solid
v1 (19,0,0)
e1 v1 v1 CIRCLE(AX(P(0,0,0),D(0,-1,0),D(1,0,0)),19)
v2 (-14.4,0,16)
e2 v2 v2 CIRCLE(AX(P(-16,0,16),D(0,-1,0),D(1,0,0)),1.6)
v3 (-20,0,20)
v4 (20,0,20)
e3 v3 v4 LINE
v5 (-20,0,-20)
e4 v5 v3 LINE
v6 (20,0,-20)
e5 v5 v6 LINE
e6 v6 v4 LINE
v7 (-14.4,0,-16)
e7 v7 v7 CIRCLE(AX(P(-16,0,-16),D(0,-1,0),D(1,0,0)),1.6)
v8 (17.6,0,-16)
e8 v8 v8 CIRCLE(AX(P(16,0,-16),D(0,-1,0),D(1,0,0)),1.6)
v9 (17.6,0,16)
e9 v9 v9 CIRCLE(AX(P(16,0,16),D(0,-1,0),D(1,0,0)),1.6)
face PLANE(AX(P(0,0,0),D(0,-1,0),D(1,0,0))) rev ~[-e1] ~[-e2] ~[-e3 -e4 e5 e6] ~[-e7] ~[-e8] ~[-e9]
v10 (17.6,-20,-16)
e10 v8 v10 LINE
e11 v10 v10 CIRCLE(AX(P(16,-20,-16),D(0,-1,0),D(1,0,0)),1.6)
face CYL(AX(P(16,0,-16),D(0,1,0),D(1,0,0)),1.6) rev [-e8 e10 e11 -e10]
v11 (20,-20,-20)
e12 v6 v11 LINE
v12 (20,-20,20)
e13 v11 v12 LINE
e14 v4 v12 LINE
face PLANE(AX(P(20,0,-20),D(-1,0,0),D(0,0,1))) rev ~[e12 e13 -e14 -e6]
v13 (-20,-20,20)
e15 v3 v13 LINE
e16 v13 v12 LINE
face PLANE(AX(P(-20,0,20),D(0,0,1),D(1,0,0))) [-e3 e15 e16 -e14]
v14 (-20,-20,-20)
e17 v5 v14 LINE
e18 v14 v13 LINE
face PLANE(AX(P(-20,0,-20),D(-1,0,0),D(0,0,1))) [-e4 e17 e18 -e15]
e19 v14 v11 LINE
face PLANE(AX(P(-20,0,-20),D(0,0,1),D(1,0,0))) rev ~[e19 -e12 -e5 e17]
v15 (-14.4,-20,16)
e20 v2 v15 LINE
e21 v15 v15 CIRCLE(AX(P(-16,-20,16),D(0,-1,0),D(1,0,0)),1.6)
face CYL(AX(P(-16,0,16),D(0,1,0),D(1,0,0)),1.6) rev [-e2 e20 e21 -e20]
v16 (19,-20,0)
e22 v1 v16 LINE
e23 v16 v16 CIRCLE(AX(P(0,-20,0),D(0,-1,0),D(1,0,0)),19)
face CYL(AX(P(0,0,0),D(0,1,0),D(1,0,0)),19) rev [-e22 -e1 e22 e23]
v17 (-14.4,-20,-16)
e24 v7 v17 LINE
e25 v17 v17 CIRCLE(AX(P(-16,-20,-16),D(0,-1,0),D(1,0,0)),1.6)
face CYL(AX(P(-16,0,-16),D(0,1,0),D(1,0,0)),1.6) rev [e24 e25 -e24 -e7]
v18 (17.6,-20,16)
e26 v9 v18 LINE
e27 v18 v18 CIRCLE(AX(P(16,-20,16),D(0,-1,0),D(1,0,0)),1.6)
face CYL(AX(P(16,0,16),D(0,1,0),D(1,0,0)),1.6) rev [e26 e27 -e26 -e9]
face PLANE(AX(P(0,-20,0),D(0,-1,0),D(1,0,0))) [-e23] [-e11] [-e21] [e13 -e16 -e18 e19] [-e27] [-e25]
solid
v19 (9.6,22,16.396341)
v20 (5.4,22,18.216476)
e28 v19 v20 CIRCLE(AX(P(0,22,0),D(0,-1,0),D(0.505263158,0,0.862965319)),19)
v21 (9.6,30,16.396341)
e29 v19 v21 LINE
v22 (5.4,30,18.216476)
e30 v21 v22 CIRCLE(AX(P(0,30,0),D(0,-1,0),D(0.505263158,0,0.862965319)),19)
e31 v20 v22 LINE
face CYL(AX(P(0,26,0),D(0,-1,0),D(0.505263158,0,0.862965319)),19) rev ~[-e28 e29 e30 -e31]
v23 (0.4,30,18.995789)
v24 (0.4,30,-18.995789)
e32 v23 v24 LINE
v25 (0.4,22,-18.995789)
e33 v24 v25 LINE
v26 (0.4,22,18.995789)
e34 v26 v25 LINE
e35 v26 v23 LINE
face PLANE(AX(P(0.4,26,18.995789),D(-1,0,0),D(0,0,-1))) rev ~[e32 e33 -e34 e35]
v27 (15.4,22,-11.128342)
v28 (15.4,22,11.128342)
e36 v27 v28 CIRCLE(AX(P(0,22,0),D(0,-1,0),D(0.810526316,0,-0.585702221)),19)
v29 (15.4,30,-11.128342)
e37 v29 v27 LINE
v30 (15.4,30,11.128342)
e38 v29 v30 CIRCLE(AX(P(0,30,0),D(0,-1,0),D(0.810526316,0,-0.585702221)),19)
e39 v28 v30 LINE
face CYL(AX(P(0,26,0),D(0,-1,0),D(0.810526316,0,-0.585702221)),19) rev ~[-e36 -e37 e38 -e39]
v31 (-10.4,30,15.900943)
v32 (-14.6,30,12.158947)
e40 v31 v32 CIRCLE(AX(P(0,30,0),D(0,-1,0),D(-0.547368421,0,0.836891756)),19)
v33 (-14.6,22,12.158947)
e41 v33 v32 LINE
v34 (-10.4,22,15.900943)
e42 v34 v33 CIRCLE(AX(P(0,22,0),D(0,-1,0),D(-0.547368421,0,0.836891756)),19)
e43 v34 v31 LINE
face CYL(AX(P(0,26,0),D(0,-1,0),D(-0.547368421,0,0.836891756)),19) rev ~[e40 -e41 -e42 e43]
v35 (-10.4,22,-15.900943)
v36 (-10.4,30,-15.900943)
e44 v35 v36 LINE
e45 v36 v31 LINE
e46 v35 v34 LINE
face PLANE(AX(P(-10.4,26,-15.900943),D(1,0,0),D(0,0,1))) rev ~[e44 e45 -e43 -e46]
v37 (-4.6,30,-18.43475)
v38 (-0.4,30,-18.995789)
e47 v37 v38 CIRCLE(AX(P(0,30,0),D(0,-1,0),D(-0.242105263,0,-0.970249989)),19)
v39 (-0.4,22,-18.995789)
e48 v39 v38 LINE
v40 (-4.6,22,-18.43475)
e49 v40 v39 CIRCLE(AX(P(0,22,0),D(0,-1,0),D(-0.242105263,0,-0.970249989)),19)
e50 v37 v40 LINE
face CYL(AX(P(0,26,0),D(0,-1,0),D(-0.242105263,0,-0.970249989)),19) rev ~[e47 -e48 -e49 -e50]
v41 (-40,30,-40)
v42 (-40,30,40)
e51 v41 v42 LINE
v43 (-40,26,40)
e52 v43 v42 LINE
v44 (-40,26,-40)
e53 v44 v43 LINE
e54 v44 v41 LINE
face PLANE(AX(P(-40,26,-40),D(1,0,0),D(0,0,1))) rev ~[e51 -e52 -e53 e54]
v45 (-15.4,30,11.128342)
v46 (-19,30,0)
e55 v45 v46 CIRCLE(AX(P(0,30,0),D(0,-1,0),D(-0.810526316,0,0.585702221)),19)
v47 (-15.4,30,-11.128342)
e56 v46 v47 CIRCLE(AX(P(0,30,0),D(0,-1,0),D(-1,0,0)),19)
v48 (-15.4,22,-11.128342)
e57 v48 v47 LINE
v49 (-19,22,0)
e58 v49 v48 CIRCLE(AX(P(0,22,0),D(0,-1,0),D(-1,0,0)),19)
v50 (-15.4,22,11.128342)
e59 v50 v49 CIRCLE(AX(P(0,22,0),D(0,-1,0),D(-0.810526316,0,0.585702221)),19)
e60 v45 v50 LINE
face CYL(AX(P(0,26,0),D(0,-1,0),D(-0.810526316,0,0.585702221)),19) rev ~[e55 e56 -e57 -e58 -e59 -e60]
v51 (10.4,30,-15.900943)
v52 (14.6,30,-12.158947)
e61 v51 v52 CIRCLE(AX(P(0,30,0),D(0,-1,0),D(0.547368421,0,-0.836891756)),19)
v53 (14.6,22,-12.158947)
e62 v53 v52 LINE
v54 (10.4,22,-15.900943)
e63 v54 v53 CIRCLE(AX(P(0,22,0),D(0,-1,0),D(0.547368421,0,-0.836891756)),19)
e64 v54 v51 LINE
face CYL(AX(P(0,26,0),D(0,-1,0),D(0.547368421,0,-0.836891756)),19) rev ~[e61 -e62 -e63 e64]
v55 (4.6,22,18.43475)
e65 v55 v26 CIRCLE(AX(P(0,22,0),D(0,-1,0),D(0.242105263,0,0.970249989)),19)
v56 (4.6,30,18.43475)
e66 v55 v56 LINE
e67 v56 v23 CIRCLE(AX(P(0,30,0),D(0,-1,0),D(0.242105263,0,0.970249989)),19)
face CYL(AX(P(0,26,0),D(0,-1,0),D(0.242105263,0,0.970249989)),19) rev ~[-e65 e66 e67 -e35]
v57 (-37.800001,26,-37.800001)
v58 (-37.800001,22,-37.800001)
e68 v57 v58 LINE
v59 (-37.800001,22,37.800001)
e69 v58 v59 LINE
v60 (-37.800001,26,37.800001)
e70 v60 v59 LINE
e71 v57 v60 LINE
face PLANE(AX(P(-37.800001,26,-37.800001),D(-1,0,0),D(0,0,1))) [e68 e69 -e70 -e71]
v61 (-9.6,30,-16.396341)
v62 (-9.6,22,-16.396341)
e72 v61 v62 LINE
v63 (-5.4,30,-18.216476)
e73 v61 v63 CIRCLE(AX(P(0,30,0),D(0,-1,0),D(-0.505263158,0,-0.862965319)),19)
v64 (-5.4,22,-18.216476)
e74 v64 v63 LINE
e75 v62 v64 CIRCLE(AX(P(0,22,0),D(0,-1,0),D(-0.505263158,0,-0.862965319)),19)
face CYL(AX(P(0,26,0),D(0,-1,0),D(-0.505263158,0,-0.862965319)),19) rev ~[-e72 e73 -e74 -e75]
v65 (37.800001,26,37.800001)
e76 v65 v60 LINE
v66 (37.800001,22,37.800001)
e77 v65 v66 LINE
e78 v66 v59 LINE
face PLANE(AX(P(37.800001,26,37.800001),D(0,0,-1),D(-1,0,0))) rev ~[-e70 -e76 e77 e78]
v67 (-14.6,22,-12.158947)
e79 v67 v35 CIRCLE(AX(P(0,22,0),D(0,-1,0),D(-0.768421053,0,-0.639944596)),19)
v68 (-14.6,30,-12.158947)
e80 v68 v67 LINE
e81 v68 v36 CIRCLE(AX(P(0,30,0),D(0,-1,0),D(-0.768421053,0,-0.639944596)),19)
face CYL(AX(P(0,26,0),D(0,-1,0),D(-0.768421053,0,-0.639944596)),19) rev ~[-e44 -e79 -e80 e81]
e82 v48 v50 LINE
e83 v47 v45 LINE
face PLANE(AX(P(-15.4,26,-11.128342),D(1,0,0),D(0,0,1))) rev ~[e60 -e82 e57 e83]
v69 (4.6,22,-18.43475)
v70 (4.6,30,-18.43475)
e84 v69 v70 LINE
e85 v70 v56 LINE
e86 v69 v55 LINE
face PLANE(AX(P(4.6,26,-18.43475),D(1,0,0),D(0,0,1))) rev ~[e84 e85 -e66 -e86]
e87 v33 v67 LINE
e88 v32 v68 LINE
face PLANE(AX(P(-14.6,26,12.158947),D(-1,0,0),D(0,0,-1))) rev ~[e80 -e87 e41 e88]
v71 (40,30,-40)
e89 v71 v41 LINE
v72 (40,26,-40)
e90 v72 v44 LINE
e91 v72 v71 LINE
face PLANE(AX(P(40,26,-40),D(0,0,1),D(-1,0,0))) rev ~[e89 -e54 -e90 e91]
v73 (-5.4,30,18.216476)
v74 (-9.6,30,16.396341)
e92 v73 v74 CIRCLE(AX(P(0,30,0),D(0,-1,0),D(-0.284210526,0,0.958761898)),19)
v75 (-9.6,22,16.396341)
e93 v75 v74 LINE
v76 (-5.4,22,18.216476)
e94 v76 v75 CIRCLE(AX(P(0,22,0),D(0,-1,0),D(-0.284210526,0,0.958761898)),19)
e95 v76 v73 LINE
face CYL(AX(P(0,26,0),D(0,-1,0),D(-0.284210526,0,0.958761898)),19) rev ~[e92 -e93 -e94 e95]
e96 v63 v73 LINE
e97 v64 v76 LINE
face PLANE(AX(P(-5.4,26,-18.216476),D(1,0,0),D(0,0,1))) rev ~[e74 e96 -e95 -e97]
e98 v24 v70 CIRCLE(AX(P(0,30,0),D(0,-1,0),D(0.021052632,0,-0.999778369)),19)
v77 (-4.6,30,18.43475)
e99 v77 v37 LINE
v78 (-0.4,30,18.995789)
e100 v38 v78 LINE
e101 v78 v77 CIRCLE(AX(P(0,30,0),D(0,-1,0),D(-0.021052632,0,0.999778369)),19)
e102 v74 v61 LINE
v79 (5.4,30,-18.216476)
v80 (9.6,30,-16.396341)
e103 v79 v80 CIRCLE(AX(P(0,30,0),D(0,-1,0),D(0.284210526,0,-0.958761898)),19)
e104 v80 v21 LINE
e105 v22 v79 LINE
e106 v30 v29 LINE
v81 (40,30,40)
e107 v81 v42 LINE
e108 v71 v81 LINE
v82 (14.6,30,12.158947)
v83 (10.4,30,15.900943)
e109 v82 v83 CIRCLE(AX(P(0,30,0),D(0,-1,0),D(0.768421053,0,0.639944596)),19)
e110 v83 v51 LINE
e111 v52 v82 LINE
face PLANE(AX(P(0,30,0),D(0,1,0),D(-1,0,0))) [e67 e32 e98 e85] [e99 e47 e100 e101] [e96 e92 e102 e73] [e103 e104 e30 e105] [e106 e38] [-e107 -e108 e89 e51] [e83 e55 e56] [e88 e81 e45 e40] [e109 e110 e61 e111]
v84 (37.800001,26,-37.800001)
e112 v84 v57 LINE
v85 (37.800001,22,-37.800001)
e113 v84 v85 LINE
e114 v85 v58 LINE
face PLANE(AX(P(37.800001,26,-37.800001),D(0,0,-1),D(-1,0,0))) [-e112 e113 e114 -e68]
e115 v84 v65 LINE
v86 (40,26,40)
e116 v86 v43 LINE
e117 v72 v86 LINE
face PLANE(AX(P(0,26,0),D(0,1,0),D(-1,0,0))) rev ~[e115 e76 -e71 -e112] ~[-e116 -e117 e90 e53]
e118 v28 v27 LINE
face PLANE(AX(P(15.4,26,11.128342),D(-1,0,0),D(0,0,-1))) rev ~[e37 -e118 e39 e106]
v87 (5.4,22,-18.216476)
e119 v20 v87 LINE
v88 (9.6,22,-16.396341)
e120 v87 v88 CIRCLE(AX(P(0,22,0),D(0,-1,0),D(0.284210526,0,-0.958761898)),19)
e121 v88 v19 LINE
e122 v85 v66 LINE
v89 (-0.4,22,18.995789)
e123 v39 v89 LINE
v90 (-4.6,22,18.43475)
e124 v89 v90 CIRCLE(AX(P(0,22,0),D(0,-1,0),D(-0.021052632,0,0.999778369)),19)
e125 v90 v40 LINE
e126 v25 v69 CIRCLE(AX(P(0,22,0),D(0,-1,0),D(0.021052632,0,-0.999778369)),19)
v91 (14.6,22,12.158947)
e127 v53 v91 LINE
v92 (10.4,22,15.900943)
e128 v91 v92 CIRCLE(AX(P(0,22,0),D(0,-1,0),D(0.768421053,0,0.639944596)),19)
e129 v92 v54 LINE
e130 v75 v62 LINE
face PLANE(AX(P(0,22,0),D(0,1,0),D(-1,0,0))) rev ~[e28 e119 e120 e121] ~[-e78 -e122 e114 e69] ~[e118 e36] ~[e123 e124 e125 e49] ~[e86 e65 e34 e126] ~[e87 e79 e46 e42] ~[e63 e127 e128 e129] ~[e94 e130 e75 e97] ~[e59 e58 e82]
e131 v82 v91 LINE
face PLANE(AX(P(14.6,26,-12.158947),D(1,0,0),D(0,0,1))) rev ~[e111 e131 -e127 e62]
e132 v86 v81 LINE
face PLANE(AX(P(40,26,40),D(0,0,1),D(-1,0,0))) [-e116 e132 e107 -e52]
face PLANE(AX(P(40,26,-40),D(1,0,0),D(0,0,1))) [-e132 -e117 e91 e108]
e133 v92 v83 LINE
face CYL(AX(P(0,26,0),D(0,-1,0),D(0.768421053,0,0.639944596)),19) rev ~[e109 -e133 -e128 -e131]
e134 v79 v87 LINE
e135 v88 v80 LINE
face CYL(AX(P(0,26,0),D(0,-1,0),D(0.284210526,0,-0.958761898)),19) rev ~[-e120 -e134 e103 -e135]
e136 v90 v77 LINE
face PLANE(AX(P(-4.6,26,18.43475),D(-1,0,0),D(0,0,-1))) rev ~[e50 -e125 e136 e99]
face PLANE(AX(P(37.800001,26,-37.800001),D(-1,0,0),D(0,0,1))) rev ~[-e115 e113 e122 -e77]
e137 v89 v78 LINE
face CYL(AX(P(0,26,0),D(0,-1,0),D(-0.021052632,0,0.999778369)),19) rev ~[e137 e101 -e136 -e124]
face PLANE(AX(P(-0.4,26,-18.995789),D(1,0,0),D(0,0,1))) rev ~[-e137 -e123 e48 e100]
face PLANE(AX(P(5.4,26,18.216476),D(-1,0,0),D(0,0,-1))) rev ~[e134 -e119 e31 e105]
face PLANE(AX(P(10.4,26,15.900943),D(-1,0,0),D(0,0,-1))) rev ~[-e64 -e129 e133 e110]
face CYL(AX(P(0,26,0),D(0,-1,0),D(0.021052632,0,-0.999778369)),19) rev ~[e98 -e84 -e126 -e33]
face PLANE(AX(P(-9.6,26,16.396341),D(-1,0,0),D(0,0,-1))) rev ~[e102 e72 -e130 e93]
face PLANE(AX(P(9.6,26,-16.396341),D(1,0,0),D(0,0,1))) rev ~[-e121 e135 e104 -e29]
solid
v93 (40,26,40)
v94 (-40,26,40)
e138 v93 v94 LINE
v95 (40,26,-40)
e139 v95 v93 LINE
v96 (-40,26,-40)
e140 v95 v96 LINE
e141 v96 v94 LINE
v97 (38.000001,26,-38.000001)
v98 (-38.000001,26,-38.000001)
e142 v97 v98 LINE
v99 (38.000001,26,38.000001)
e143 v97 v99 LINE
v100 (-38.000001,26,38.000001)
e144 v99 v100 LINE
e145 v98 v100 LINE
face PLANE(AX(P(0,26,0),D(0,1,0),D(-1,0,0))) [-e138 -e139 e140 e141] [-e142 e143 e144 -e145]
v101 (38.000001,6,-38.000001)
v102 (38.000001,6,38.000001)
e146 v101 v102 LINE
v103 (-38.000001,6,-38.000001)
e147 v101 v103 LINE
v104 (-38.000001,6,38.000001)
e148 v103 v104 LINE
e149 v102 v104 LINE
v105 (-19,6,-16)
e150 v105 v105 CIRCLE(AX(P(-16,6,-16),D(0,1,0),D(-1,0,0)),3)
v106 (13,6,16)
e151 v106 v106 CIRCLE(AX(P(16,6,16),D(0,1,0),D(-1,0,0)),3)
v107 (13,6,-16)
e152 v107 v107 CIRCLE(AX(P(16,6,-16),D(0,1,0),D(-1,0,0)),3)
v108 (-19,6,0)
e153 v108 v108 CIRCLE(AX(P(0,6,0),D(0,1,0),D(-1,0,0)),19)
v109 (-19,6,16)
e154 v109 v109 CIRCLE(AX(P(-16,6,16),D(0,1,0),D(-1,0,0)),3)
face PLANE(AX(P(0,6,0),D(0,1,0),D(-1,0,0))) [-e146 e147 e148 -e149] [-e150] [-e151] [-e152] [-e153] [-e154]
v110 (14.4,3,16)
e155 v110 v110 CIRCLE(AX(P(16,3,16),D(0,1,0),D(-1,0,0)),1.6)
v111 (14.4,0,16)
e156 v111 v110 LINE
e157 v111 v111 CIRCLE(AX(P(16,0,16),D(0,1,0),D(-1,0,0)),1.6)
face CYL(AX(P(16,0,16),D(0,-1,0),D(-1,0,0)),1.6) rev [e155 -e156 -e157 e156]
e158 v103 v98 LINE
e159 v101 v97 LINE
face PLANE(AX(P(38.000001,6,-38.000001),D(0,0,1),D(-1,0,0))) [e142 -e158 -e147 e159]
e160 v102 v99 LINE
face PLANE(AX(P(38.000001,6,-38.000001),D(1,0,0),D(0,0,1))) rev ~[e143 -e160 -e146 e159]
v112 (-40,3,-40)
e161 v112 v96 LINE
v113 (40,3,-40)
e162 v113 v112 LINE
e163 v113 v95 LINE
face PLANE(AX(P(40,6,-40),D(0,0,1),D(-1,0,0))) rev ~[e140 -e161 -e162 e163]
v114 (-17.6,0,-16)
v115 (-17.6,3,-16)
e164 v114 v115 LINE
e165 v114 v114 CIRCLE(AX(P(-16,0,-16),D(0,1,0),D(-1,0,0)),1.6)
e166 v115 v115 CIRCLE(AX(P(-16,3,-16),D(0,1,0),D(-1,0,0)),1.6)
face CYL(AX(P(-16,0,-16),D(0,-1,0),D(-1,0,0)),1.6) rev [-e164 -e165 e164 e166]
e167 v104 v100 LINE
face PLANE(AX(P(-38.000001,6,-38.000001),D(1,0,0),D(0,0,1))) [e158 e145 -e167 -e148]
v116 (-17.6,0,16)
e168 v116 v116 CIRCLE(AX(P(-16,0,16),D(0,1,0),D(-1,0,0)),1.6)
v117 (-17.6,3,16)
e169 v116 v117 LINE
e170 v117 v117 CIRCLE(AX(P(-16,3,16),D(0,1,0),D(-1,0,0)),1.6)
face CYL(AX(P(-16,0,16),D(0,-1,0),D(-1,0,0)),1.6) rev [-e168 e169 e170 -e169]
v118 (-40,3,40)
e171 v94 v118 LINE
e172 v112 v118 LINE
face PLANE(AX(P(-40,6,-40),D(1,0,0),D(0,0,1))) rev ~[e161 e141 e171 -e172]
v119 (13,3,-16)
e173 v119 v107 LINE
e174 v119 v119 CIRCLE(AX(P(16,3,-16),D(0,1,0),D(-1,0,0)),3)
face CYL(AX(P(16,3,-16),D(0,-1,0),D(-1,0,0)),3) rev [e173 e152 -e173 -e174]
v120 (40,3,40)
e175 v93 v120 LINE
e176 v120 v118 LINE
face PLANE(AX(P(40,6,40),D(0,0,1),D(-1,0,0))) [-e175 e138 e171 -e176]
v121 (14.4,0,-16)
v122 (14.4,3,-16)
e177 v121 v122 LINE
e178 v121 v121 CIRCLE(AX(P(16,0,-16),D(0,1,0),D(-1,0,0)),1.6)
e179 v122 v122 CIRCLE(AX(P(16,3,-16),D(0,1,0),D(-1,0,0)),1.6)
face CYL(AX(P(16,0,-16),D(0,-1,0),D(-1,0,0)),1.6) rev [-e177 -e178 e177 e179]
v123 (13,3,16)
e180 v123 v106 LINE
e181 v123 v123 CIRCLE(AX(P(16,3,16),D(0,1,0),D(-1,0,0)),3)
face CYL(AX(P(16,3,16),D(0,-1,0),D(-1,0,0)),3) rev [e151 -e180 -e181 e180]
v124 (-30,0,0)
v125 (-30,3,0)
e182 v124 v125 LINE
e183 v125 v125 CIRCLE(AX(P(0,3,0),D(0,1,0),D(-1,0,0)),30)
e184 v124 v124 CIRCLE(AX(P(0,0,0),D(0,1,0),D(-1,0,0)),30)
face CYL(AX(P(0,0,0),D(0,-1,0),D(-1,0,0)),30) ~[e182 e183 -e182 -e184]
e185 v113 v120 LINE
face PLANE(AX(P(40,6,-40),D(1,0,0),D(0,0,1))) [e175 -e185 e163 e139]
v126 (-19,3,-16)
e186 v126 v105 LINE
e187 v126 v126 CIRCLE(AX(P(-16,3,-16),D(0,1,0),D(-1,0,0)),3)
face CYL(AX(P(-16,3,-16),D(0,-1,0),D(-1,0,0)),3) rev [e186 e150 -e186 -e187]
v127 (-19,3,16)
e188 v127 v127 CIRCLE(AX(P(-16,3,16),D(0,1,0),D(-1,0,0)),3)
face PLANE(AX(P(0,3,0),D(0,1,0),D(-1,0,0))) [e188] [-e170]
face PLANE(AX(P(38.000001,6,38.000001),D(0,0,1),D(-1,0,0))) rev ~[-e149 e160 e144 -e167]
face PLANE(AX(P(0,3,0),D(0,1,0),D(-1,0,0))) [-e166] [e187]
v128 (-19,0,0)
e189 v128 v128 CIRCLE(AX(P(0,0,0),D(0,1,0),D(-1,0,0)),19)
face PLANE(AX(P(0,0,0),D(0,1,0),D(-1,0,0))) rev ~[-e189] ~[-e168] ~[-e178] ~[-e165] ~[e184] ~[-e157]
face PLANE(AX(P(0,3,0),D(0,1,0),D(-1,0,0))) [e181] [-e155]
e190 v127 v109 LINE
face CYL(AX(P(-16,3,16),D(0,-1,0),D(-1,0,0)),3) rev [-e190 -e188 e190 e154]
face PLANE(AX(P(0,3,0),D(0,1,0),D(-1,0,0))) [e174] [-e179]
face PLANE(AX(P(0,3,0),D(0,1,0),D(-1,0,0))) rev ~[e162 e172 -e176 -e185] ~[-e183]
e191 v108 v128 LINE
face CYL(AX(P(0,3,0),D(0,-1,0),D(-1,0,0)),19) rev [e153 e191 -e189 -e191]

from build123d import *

# Parameters (mm, degrees)
F0_W      = 40
F0_H      = 40
F0_R      = 1.6
F0_R_2    = 19
F1_DEPTH  = 20
F2_R      = 30
F2_W      = 40
F2_H      = 40
F2_R_2    = 1.6
F2_R_3    = 19
F3_DEPTH  = 3
F4_W      = 80
F4_H      = 80
F4_R      = 30
F4_R_2    = 3
F4_R_3    = 19
F5_DEPTH  = 3
F6_W      = 80
F6_H      = 80
F6_W_2    = 76.0000017285
F6_H_2    = 76.0000017285
F7_DEPTH  = 20
F8_W      = 75.600002408
F8_H      = 75.600002408
F9_DEPTH  = 4
F8_W_2    = 80
F8_H_2    = 80
F8_W_3    = 76.0000017285
F8_H_3    = 76.0000017285
F10_DEPTH = 4


# Not quite as in the source:
# - a feature names something its author has since deleted; it is built from what else it names


with BuildPart() as f1:
    # F0 (on Front) → F1 (new body)
    with BuildSketch(Plane.XZ):
        Rectangle(F0_W, F0_H)
        with Locations((-16, -16)):
            Circle(F0_R, mode=Mode.SUBTRACT)
        with Locations((16, -16)):
            Circle(F0_R, mode=Mode.SUBTRACT)
        with Locations((-16, 16)):
            Circle(F0_R, mode=Mode.SUBTRACT)
        Circle(F0_R_2, mode=Mode.SUBTRACT)
        with Locations((16, 16)):
            Circle(F0_R, mode=Mode.SUBTRACT)
    extrude(amount=F1_DEPTH)


with BuildPart() as f3:
    # F2 (on face) → F3 (new body)
    with BuildSketch(Plane(origin=(0, 0, 0), x_dir=(-1, 0, 0), z_dir=(0, 1, 0))):
        Circle(F2_R)
        Rectangle(F2_W, F2_H, mode=Mode.SUBTRACT)
        Rectangle(F2_W, F2_H)
        with Locations((-16, -16)):
            Circle(F2_R_2, mode=Mode.SUBTRACT)
        with Locations((16, -16)):
            Circle(F2_R_2, mode=Mode.SUBTRACT)
        with Locations((-16, 16)):
            Circle(F2_R_2, mode=Mode.SUBTRACT)
        Circle(F2_R_3, mode=Mode.SUBTRACT)
        with Locations((16, 16)):
            Circle(F2_R_2, mode=Mode.SUBTRACT)
    extrude(amount=F3_DEPTH)

    # F4 (on face) → F5 (join)
    with BuildSketch(Plane(origin=(0, 3, 0), x_dir=(-1, 0, 0), z_dir=(0, 1, 0))):
        Rectangle(F4_W, F4_H)
        Circle(F4_R, mode=Mode.SUBTRACT)
        Circle(F4_R)
        with Locations((-16, -16)):
            Circle(F4_R_2, mode=Mode.SUBTRACT)
        with Locations((16, -16)):
            Circle(F4_R_2, mode=Mode.SUBTRACT)
        with Locations((-16, 16)):
            Circle(F4_R_2, mode=Mode.SUBTRACT)
        Circle(F4_R_3, mode=Mode.SUBTRACT)
        with Locations((16, 16)):
            Circle(F4_R_2, mode=Mode.SUBTRACT)
    extrude(amount=F5_DEPTH)

    # F6 (on face) → F7 (join)
    with BuildSketch(Plane(origin=(0, 6, 0), x_dir=(-1, 0, 0), z_dir=(0, 1, 0))):
        Rectangle(F6_W, F6_H)
        Rectangle(F6_W_2, F6_H_2, mode=Mode.SUBTRACT)
    extrude(amount=F7_DEPTH)


with BuildPart() as f9:
    # F8 (on face) → F9 (new body)
    with BuildSketch(Plane(origin=(0, 26, 0), x_dir=(-1, 0, 0), z_dir=(0, 1, 0))):
        Rectangle(F8_W, F8_H)
        with BuildLine():
            ThreePointArc((15.4, 11.1283421946), (18.0776104616, 5.8480766069), (19, 0))
            ThreePointArc((19, 0), (18.0776104616, -5.8480766069), (15.4, -11.1283421946))
            ThreePointArc((15.4, -11.1283421946), (15.0088486145, -11.6505134336), (14.6, -12.1589473229))
            ThreePointArc((14.6, -12.1589473229), (12.6392497246, -14.1862386276), (10.4, -15.9009433682))
            ThreePointArc((10.4, -15.9009433682), (10.0030672654, -16.153595429), (9.6, -16.3963410552))
            ThreePointArc((9.6, -16.3963410552), (7.5550130945, -17.4333524356), (5.4, -18.2164760588))
            ThreePointArc((5.4, -18.2164760588), (5.0011909438, -18.3299778817), (4.6, -18.4347497949))
            ThreePointArc((4.6, -18.4347497949), (2.5156890208, -18.8327191014), (0.4, -18.995789007))
            ThreePointArc((0.4, -18.995789007), (0, -19), (-0.4, -18.995789007))
            ThreePointArc((-0.4, -18.995789007), (-2.5156890208, -18.8327191014), (-4.6, -18.4347497949))
            ThreePointArc((-4.6, -18.4347497949), (-5.0011909438, -18.3299778817), (-5.4, -18.2164760588))
            ThreePointArc((-5.4, -18.2164760588), (-7.5550130945, -17.4333524356), (-9.6, -16.3963410552))
            ThreePointArc((-9.6, -16.3963410552), (-10.0030672654, -16.153595429), (-10.4, -15.9009433682))
            ThreePointArc((-10.4, -15.9009433682), (-12.6392497246, -14.1862386276), (-14.6, -12.1589473229))
            ThreePointArc((-14.6, -12.1589473229), (-15.0088486145, -11.6505134336), (-15.4, -11.1283421946))
            ThreePointArc((-15.4, -11.1283421946), (-19, 0), (-15.4, 11.1283421946))
            ThreePointArc((-15.4, 11.1283421946), (-15.0088486145, 11.6505134336), (-14.6, 12.1589473229))
            ThreePointArc((-14.6, 12.1589473229), (-12.6392497246, 14.1862386276), (-10.4, 15.9009433682))
            ThreePointArc((-10.4, 15.9009433682), (-10.0030672654, 16.153595429), (-9.6, 16.3963410552))
            ThreePointArc((-9.6, 16.3963410552), (-7.5550130945, 17.4333524356), (-5.4, 18.2164760588))
            ThreePointArc((-5.4, 18.2164760588), (-5.0011909438, 18.3299778817), (-4.6, 18.4347497949))
            ThreePointArc((-4.6, 18.4347497949), (-2.5156890208, 18.8327191014), (-0.4, 18.995789007))
            ThreePointArc((-0.4, 18.995789007), (0, 19), (0.4, 18.995789007))
            ThreePointArc((0.4, 18.995789007), (2.5156890208, 18.8327191014), (4.6, 18.4347497949))
            ThreePointArc((4.6, 18.4347497949), (5.0011909438, 18.3299778817), (5.4, 18.2164760588))
            ThreePointArc((5.4, 18.2164760588), (7.5550130945, 17.4333524356), (9.6, 16.3963410552))
            ThreePointArc((9.6, 16.3963410552), (10.0030672654, 16.153595429), (10.4, 15.9009433682))
            ThreePointArc((10.4, 15.9009433682), (12.6392497246, 14.1862386276), (14.6, 12.1589473229))
            ThreePointArc((14.6, 12.1589473229), (15.0088486145, 11.6505134336), (15.4, 11.1283421946))
        make_face(mode=Mode.SUBTRACT)
        with BuildLine():
            Line((-14.6, -12.1589473229), (-14.6, 12.1589473229))
            ThreePointArc((-14.6, 12.1589473229), (-15.0088486145, 11.6505134336), (-15.4, 11.1283421946))
            Line((-15.4, 11.1283421946), (-15.4, -11.1283421946))
            ThreePointArc((-15.4, -11.1283421946), (-15.0088486145, -11.6505134336), (-14.6, -12.1589473229))
        make_face()
        with BuildLine():
            Line((-9.6, -16.3963410552), (-9.6, 16.3963410552))
            ThreePointArc((-9.6, 16.3963410552), (-10.0030672654, 16.153595429), (-10.4, 15.9009433682))
            Line((-10.4, 15.9009433682), (-10.4, -15.9009433682))
            ThreePointArc((-10.4, -15.9009433682), (-10.0030672654, -16.153595429), (-9.6, -16.3963410552))
        make_face()
        with BuildLine():
            Line((-4.6, -18.4347497949), (-4.6, 18.4347497949))
            ThreePointArc((-4.6, 18.4347497949), (-5.0011909438, 18.3299778817), (-5.4, 18.2164760588))
            Line((-5.4, 18.2164760588), (-5.4, -18.2164760588))
            ThreePointArc((-5.4, -18.2164760588), (-5.0011909438, -18.3299778817), (-4.6, -18.4347497949))
        make_face()
        with BuildLine():
            Line((0.4, -18.995789007), (0.4, 18.995789007))
            ThreePointArc((0.4, 18.995789007), (0, 19), (-0.4, 18.995789007))
            Line((-0.4, 18.995789007), (-0.4, -18.995789007))
            ThreePointArc((-0.4, -18.995789007), (0, -19), (0.4, -18.995789007))
        make_face()
        with BuildLine():
            Line((5.4, -18.2164760588), (5.4, 18.2164760588))
            ThreePointArc((5.4, 18.2164760588), (5.0011909438, 18.3299778817), (4.6, 18.4347497949))
            Line((4.6, 18.4347497949), (4.6, -18.4347497949))
            ThreePointArc((4.6, -18.4347497949), (5.0011909438, -18.3299778817), (5.4, -18.2164760588))
        make_face()
        with BuildLine():
            Line((10.4, -15.9009433682), (10.4, 15.9009433682))
            ThreePointArc((10.4, 15.9009433682), (10.0030672654, 16.153595429), (9.6, 16.3963410552))
            Line((9.6, 16.3963410552), (9.6, -16.3963410552))
            ThreePointArc((9.6, -16.3963410552), (10.0030672654, -16.153595429), (10.4, -15.9009433682))
        make_face()
        with BuildLine():
            Line((15.4, -11.1283421946), (15.4, 11.1283421946))
            ThreePointArc((15.4, 11.1283421946), (15.0088486145, 11.6505134336), (14.6, 12.1589473229))
            Line((14.6, 12.1589473229), (14.6, -12.1589473229))
            ThreePointArc((14.6, -12.1589473229), (15.0088486145, -11.6505134336), (15.4, -11.1283421946))
        make_face()
    extrude(amount=-F9_DEPTH)

    # F8 (on face) → F10 (join)
    with BuildSketch(Plane(origin=(0, 26, 0), x_dir=(-1, 0, 0), z_dir=(0, 1, 0))):
        Rectangle(F8_W_2, F8_H_2)
        Rectangle(F8_W_3, F8_H_3, mode=Mode.SUBTRACT)
        Rectangle(F8_W_3, F8_H_3)
        Rectangle(F8_W, F8_H, mode=Mode.SUBTRACT)
        Rectangle(F8_W, F8_H)
        with BuildLine():
            ThreePointArc((15.4, 11.1283421946), (18.0776104616, 5.8480766069), (19, 0))
            ThreePointArc((19, 0), (18.0776104616, -5.8480766069), (15.4, -11.1283421946))
            ThreePointArc((15.4, -11.1283421946), (15.0088486145, -11.6505134336), (14.6, -12.1589473229))
            ThreePointArc((14.6, -12.1589473229), (12.6392497246, -14.1862386276), (10.4, -15.9009433682))
            ThreePointArc((10.4, -15.9009433682), (10.0030672654, -16.153595429), (9.6, -16.3963410552))
            ThreePointArc((9.6, -16.3963410552), (7.5550130945, -17.4333524356), (5.4, -18.2164760588))
            ThreePointArc((5.4, -18.2164760588), (5.0011909438, -18.3299778817), (4.6, -18.4347497949))
            ThreePointArc((4.6, -18.4347497949), (2.5156890208, -18.8327191014), (0.4, -18.995789007))
            ThreePointArc((0.4, -18.995789007), (0, -19), (-0.4, -18.995789007))
            ThreePointArc((-0.4, -18.995789007), (-2.5156890208, -18.8327191014), (-4.6, -18.4347497949))
            ThreePointArc((-4.6, -18.4347497949), (-5.0011909438, -18.3299778817), (-5.4, -18.2164760588))
            ThreePointArc((-5.4, -18.2164760588), (-7.5550130945, -17.4333524356), (-9.6, -16.3963410552))
            ThreePointArc((-9.6, -16.3963410552), (-10.0030672654, -16.153595429), (-10.4, -15.9009433682))
            ThreePointArc((-10.4, -15.9009433682), (-12.6392497246, -14.1862386276), (-14.6, -12.1589473229))
            ThreePointArc((-14.6, -12.1589473229), (-15.0088486145, -11.6505134336), (-15.4, -11.1283421946))
            ThreePointArc((-15.4, -11.1283421946), (-19, 0), (-15.4, 11.1283421946))
            ThreePointArc((-15.4, 11.1283421946), (-15.0088486145, 11.6505134336), (-14.6, 12.1589473229))
            ThreePointArc((-14.6, 12.1589473229), (-12.6392497246, 14.1862386276), (-10.4, 15.9009433682))
            ThreePointArc((-10.4, 15.9009433682), (-10.0030672654, 16.153595429), (-9.6, 16.3963410552))
            ThreePointArc((-9.6, 16.3963410552), (-7.5550130945, 17.4333524356), (-5.4, 18.2164760588))
            ThreePointArc((-5.4, 18.2164760588), (-5.0011909438, 18.3299778817), (-4.6, 18.4347497949))
            ThreePointArc((-4.6, 18.4347497949), (-2.5156890208, 18.8327191014), (-0.4, 18.995789007))
            ThreePointArc((-0.4, 18.995789007), (0, 19), (0.4, 18.995789007))
            ThreePointArc((0.4, 18.995789007), (2.5156890208, 18.8327191014), (4.6, 18.4347497949))
            ThreePointArc((4.6, 18.4347497949), (5.0011909438, 18.3299778817), (5.4, 18.2164760588))
            ThreePointArc((5.4, 18.2164760588), (7.5550130945, 17.4333524356), (9.6, 16.3963410552))
            ThreePointArc((9.6, 16.3963410552), (10.0030672654, 16.153595429), (10.4, 15.9009433682))
            ThreePointArc((10.4, 15.9009433682), (12.6392497246, 14.1862386276), (14.6, 12.1589473229))
            ThreePointArc((14.6, 12.1589473229), (15.0088486145, 11.6505134336), (15.4, 11.1283421946))
        make_face(mode=Mode.SUBTRACT)
        with BuildLine():
            Line((-9.6, -16.3963410552), (-9.6, 16.3963410552))
            ThreePointArc((-9.6, 16.3963410552), (-10.0030672654, 16.153595429), (-10.4, 15.9009433682))
            Line((-10.4, 15.9009433682), (-10.4, -15.9009433682))
            ThreePointArc((-10.4, -15.9009433682), (-10.0030672654, -16.153595429), (-9.6, -16.3963410552))
        make_face()
        with BuildLine():
            Line((-14.6, -12.1589473229), (-14.6, 12.1589473229))
            ThreePointArc((-14.6, 12.1589473229), (-15.0088486145, 11.6505134336), (-15.4, 11.1283421946))
            Line((-15.4, 11.1283421946), (-15.4, -11.1283421946))
            ThreePointArc((-15.4, -11.1283421946), (-15.0088486145, -11.6505134336), (-14.6, -12.1589473229))
        make_face()
        with BuildLine():
            Line((-4.6, -18.4347497949), (-4.6, 18.4347497949))
            ThreePointArc((-4.6, 18.4347497949), (-5.0011909438, 18.3299778817), (-5.4, 18.2164760588))
            Line((-5.4, 18.2164760588), (-5.4, -18.2164760588))
            ThreePointArc((-5.4, -18.2164760588), (-5.0011909438, -18.3299778817), (-4.6, -18.4347497949))
        make_face()
        with BuildLine():
            Line((0.4, -18.995789007), (0.4, 18.995789007))
            ThreePointArc((0.4, 18.995789007), (0, 19), (-0.4, 18.995789007))
            Line((-0.4, 18.995789007), (-0.4, -18.995789007))
            ThreePointArc((-0.4, -18.995789007), (0, -19), (0.4, -18.995789007))
        make_face()
        with BuildLine():
            Line((5.4, -18.2164760588), (5.4, 18.2164760588))
            ThreePointArc((5.4, 18.2164760588), (5.0011909438, 18.3299778817), (4.6, 18.4347497949))
            Line((4.6, 18.4347497949), (4.6, -18.4347497949))
            ThreePointArc((4.6, -18.4347497949), (5.0011909438, -18.3299778817), (5.4, -18.2164760588))
        make_face()
        with BuildLine():
            Line((10.4, -15.9009433682), (10.4, 15.9009433682))
            ThreePointArc((10.4, 15.9009433682), (10.0030672654, 16.153595429), (9.6, 16.3963410552))
            Line((9.6, 16.3963410552), (9.6, -16.3963410552))
            ThreePointArc((9.6, -16.3963410552), (10.0030672654, -16.153595429), (10.4, -15.9009433682))
        make_face()
        with BuildLine():
            Line((15.4, -11.1283421946), (15.4, 11.1283421946))
            ThreePointArc((15.4, 11.1283421946), (15.0088486145, 11.6505134336), (14.6, 12.1589473229))
            Line((14.6, 12.1589473229), (14.6, -12.1589473229))
            ThreePointArc((14.6, -12.1589473229), (15.0088486145, -11.6505134336), (15.4, -11.1283421946))
        make_face()
    extrude(amount=F10_DEPTH)


solid = Compound([f1.part, f3.part, f9.part])
